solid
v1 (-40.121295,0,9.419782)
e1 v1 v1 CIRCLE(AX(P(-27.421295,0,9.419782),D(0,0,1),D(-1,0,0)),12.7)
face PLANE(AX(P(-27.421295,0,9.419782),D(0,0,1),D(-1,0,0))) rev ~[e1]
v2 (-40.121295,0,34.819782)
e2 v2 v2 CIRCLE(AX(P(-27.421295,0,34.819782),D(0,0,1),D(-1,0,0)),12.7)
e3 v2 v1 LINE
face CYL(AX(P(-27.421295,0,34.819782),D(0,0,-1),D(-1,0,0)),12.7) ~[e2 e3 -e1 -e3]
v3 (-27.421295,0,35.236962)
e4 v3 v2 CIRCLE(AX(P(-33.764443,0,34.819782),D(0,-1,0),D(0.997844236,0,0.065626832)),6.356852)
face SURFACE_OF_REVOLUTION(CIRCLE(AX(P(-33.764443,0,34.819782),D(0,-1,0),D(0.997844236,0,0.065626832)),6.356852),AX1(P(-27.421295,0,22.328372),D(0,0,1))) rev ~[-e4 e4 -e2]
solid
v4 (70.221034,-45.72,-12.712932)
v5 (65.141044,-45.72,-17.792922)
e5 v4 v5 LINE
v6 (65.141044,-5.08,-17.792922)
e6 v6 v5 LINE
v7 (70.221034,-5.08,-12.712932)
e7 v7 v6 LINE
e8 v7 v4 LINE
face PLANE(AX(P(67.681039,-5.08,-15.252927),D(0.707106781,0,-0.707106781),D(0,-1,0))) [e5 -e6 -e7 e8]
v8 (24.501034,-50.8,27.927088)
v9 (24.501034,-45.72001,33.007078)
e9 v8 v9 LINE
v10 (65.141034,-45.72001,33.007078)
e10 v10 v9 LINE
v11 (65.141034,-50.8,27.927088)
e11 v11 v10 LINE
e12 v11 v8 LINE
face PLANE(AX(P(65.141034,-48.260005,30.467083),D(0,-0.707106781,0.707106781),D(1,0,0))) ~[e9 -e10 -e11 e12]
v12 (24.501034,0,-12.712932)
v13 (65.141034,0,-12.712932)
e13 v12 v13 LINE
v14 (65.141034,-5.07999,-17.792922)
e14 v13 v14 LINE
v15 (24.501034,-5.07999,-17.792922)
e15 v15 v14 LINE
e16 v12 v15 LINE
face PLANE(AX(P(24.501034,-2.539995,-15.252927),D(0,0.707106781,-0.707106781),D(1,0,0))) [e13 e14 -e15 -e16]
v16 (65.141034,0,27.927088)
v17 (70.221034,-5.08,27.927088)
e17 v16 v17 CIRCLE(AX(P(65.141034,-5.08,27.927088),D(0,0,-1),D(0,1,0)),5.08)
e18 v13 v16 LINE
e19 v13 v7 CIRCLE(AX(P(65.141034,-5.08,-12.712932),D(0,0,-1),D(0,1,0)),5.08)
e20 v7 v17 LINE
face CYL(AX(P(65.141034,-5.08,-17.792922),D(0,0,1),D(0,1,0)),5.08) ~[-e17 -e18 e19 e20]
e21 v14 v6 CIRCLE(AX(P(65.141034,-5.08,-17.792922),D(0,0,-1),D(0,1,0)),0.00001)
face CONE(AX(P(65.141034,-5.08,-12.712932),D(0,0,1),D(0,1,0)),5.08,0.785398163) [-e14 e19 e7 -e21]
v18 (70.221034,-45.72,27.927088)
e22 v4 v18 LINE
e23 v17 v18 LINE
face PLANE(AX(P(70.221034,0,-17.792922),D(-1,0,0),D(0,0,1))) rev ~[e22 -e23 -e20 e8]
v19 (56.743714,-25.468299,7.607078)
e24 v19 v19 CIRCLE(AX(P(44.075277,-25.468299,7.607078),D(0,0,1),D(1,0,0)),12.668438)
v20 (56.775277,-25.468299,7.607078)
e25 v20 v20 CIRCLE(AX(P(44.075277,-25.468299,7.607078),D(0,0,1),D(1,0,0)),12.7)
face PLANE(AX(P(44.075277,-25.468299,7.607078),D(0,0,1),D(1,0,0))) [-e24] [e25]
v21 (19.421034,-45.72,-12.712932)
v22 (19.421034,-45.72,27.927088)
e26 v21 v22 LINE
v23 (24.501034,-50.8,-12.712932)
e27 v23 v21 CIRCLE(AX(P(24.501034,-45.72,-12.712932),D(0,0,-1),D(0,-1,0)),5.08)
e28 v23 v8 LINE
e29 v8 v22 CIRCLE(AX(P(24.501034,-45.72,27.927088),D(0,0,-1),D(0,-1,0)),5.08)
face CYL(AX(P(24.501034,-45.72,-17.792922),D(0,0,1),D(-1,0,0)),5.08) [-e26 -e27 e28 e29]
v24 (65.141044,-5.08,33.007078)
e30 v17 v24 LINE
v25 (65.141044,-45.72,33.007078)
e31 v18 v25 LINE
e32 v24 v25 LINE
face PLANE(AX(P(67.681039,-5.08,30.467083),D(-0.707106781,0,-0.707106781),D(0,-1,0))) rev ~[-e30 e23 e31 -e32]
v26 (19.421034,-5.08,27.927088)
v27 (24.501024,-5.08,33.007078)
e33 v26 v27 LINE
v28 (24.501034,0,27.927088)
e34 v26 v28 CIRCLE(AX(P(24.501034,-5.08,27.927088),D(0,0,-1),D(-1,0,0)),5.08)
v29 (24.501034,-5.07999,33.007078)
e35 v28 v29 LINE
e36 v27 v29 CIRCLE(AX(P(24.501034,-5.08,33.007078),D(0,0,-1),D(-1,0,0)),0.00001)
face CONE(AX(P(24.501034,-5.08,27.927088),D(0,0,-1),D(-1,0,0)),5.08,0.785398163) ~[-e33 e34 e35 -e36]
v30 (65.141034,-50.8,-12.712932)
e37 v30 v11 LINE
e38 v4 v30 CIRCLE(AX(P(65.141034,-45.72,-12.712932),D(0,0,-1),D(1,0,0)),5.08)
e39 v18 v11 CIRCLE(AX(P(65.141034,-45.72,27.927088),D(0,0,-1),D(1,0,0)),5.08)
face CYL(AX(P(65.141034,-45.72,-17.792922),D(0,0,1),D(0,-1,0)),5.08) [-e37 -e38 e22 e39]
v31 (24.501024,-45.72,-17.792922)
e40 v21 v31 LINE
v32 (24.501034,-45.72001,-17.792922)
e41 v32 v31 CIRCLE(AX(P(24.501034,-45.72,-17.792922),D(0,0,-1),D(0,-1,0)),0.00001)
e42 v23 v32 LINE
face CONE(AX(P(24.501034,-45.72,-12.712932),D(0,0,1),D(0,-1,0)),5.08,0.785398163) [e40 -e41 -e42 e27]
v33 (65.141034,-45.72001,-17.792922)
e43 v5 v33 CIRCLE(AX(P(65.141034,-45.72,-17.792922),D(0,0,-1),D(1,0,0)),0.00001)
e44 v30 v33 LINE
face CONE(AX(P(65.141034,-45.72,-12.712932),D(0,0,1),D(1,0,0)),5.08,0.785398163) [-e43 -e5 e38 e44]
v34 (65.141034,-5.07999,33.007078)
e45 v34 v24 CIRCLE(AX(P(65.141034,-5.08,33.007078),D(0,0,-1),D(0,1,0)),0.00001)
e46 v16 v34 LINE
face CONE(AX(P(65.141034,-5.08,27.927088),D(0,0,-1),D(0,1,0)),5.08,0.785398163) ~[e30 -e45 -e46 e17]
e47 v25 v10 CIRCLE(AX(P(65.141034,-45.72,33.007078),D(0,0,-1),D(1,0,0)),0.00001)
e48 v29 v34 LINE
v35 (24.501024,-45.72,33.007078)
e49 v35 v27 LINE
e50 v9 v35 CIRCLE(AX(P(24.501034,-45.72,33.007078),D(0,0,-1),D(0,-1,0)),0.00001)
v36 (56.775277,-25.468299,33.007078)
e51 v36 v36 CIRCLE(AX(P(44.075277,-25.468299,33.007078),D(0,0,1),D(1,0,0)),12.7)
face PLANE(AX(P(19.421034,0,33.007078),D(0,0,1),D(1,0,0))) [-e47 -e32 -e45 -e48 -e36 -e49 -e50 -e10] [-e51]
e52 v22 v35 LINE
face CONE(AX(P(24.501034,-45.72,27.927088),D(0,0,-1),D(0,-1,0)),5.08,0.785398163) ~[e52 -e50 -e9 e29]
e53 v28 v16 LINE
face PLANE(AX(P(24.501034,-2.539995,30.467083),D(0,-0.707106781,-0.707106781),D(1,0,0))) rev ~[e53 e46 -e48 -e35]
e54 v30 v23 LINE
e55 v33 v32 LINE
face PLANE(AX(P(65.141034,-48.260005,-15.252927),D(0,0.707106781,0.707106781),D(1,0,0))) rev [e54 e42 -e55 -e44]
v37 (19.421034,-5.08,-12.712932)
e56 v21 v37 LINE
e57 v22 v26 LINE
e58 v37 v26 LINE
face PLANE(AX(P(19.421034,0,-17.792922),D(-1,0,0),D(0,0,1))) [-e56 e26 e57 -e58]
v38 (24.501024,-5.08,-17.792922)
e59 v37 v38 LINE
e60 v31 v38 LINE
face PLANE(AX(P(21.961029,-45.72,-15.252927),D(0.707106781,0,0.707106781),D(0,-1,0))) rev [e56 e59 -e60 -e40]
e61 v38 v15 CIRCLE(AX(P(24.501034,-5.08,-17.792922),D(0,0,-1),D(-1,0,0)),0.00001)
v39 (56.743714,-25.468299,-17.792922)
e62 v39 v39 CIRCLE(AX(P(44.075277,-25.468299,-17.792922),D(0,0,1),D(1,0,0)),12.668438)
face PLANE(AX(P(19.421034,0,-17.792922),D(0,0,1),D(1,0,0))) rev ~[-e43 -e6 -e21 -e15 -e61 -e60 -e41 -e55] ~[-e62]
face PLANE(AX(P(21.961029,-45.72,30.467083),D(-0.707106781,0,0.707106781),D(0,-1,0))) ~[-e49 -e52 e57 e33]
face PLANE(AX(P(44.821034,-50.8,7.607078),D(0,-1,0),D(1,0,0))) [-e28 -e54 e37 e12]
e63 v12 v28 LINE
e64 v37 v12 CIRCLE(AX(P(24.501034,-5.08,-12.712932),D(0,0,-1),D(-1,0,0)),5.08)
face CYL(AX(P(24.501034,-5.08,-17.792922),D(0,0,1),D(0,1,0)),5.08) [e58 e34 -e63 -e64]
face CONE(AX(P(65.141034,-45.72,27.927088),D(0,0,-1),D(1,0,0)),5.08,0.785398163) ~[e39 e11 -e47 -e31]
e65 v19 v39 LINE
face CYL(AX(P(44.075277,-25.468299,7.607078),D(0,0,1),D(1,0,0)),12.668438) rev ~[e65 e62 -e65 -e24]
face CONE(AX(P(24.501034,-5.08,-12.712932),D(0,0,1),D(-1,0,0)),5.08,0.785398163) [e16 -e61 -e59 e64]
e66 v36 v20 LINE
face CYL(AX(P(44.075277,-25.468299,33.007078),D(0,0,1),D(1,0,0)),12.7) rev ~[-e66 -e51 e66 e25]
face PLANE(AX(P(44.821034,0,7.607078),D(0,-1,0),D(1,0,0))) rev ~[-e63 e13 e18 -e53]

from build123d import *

# Parameters (mm, degrees)
F2_W      = 50.8
F2_H      = 50.8
F3_DEPTH  = 50.8
F4_R      = 5.08
F5_R      = 5.08
F6_R      = 5.08
F7_SIZE   = 5.07999
F8_SIZE   = 5.07999
F9_R      = 12.7
F10_DEPTH = 25.4
F11_R     = 12.6684377853
F12_DEPTH = 25.4


# Not quite as in the source:
# - a fillet or chamfer is up to 0.001 mm smaller than in the source, because OpenCascade refuses the exact size


with BuildPart() as f1:
    # F0 (on Front) → F1 (revolve)
    with BuildSketch(Plane.XZ):
        with BuildLine():
            ThreePointArc((-27.421294558, 35.2369621396), (-33.9731451561, 41.1732071319), (-40.121294558, 34.8197820872))
            Line((-40.121294558, 34.8197820872), (-40.121294558, 9.4197820872))
            Line((-40.121294558, 9.4197820872), (-27.421294558, 9.4197820872))
            Line((-27.421294558, 9.4197820872), (-27.421294558, 35.2369621396))
        make_face()
    revolve(axis=Axis((-27.421294558, 0, 22.3283721134), (0, 0, 1)))


with BuildPart() as f3:
    # F2 (on Front) → F3 (new body)
    with BuildSketch(Plane.XZ):
        with Locations((44.8210335612, 7.6070784867)):
            Rectangle(F2_W, F2_H)
    extrude(amount=F3_DEPTH)

    # F4
    f4_edges = [f3.edges().sort_by_distance(p)[0] for p in [
        (19.421034, -50.8, 7.607078),
    ]]
    fillet(f4_edges, radius=F4_R)

    # F5
    f5_edges = [f3.edges().sort_by_distance(p)[0] for p in [
        (70.221034, -50.8, 7.607078),
        (70.221034, 0, 7.607078),
    ]]
    fillet(f5_edges, radius=F5_R)

    # F6
    f6_edges = [f3.edges().sort_by_distance(p)[0] for p in [
        (19.421034, 0, 7.607078),
    ]]
    fillet(f6_edges, radius=F6_R)

    # F7 (size 5.08 in the source; OpenCascade refuses exactly that, so slightly less here)
    f7_edges = [f3.edges().sort_by_distance(p)[0] for p in [
        (44.821034, 0, 33.007078),
        (20.908931, -1.487898, 33.007078),
        (68.733136, -1.487898, 33.007078),
        (19.421034, -25.4, 33.007078),
        (70.221034, -25.4, 33.007078),
        (20.908931, -49.312102, 33.007078),
        (68.733136, -49.312102, 33.007078),
        (44.821034, -50.8, 33.007078),
    ]]
    chamfer(f7_edges, length=F7_SIZE)

    # F8 (size 5.08 in the source; OpenCascade refuses exactly that, so slightly less here)
    f8_edges = [f3.edges().sort_by_distance(p)[0] for p in [
        (44.821034, 0, -17.792922),
        (20.908931, -1.487898, -17.792922),
        (68.733136, -1.487898, -17.792922),
        (19.421034, -25.4, -17.792922),
        (70.221034, -25.4, -17.792922),
        (20.908931, -49.312102, -17.792922),
        (68.733136, -49.312102, -17.792922),
        (44.821034, -50.8, -17.792922),
    ]]
    chamfer(f8_edges, length=F8_SIZE)

    # F9 (on face) → F10 (cut)
    with BuildSketch(Plane.XY.offset(33.0070784867)):
        with Locations((44.0752767026, -25.4682991654)):
            Circle(F9_R)
    extrude(amount=-F10_DEPTH, mode=Mode.SUBTRACT)

    # F11 (on face) → F12 (cut)
    with BuildSketch(Plane.XY.offset(7.6070784867)):
        with Locations((44.0752767026, -25.4682991654)):
            Circle(F11_R)
    extrude(amount=-F12_DEPTH, mode=Mode.SUBTRACT)


solid = Compound([f1.part, f3.part])
